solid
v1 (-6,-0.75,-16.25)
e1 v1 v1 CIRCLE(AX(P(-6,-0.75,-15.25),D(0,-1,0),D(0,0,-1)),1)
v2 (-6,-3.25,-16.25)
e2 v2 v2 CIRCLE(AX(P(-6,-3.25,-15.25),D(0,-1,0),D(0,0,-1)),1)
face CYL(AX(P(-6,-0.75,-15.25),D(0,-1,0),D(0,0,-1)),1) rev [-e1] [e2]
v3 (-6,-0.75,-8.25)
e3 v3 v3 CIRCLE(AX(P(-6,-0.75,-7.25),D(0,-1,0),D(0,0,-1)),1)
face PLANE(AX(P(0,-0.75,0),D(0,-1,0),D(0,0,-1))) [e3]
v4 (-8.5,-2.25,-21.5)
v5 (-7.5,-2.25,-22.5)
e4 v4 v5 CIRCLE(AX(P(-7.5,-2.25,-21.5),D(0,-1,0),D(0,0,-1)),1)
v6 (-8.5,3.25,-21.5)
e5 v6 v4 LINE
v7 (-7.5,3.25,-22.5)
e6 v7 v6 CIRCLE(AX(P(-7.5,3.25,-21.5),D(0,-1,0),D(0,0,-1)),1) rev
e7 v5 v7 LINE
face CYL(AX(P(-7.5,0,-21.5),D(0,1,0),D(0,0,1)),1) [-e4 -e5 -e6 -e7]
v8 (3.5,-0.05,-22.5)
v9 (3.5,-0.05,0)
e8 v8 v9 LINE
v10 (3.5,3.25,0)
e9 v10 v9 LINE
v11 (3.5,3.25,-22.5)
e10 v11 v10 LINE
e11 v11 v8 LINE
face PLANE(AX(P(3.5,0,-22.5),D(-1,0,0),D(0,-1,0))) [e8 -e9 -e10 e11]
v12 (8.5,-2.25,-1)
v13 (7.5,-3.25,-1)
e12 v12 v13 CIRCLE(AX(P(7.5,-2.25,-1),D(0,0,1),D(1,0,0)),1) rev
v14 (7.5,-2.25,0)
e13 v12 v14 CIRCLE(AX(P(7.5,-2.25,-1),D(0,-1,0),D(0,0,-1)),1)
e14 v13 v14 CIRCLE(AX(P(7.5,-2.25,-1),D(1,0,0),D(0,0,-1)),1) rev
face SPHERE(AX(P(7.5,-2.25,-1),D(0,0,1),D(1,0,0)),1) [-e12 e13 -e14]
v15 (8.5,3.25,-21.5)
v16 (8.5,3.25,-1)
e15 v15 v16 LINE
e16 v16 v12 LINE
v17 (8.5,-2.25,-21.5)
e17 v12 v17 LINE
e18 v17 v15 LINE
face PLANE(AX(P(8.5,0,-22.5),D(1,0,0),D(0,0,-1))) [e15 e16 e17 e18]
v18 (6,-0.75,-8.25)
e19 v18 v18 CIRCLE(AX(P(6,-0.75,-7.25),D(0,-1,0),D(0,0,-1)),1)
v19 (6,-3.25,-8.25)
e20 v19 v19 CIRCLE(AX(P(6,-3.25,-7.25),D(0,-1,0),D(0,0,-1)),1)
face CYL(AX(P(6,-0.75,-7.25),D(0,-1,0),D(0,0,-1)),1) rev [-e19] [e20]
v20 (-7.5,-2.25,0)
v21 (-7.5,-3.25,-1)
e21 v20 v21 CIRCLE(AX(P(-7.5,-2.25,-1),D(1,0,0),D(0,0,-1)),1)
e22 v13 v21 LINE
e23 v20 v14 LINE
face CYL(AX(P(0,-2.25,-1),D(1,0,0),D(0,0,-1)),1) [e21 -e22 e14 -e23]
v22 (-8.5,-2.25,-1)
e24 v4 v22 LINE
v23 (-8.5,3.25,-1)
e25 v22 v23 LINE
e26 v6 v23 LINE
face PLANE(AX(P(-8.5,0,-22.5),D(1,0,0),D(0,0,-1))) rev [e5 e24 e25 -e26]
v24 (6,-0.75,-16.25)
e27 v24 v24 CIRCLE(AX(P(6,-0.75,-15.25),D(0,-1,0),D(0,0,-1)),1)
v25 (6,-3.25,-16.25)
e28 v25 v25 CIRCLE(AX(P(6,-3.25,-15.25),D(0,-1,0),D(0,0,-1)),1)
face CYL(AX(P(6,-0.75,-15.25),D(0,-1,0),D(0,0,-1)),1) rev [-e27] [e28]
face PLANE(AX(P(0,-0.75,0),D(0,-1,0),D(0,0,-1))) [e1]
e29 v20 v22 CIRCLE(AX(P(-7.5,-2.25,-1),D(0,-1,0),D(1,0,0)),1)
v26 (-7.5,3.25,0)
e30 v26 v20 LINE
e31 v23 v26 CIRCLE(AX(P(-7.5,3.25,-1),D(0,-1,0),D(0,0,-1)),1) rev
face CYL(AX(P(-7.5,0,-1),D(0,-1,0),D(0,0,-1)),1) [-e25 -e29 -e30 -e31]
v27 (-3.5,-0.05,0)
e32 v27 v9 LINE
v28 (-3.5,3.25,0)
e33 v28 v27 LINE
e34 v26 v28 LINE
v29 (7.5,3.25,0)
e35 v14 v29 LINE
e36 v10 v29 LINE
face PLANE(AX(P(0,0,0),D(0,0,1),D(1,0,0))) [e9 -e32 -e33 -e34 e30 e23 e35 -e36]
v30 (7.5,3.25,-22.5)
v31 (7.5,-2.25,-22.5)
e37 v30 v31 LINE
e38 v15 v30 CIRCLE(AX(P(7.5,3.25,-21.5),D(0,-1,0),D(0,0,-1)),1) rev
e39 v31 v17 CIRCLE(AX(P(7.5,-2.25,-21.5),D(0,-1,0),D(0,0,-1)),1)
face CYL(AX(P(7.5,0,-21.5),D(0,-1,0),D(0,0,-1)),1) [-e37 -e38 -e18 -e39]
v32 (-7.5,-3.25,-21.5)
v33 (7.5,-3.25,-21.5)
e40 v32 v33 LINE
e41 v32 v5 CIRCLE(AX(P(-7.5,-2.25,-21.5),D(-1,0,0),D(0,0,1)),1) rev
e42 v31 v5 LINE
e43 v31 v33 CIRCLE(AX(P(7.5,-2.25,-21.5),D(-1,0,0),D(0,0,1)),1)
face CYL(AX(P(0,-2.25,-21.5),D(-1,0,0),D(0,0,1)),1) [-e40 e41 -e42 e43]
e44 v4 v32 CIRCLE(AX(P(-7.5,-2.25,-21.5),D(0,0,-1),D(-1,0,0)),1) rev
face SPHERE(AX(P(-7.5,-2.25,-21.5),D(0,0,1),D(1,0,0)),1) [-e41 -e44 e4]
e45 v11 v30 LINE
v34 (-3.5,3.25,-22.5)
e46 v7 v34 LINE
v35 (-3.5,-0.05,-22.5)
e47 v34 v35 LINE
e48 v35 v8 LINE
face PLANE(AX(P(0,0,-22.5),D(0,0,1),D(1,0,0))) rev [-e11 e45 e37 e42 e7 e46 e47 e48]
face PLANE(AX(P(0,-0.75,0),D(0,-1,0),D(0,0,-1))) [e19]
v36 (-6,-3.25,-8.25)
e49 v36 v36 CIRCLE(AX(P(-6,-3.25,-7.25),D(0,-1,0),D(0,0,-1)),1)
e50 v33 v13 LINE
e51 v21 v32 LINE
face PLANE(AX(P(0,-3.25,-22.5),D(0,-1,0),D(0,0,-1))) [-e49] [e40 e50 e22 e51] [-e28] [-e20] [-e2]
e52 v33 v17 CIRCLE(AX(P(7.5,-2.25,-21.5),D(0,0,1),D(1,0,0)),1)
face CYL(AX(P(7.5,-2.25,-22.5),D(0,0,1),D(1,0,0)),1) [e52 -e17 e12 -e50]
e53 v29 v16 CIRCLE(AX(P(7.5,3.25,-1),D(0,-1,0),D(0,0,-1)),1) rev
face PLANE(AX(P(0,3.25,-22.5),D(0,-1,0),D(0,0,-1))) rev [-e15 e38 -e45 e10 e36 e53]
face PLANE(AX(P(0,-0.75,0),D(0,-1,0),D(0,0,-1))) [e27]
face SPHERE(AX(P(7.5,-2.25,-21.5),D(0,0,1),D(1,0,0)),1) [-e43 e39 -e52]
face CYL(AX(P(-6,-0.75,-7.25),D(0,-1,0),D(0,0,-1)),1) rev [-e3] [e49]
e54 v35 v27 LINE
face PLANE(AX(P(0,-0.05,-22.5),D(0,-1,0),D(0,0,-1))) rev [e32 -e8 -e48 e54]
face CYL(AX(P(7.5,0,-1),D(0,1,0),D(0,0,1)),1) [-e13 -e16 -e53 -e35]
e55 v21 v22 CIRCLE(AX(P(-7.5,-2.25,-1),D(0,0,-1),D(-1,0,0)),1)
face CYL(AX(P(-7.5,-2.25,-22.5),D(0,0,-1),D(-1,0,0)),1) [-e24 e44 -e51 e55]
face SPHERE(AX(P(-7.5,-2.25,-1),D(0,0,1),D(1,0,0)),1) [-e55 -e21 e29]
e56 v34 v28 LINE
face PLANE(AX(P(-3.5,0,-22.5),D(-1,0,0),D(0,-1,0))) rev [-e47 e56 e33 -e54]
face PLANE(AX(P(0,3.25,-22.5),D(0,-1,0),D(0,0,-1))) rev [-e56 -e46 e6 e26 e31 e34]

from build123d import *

# Parameters (mm, degrees)
EXTRUDE_1_DEPTH     = 22.5
CUT_EXTRUDE_1_DEPTH = 2.5
FILLET_1_R          = 1
FILLET_2_R          = 1


with BuildPart() as part:
    # 草图1 → 凸台-拉伸1 (new body)
    with BuildSketch(Plane.XY):
        Polygon((-8.5, 3.25), (-8.5, -3.25), (8.5, -3.25), (8.5, 3.25), (3.5, 3.25), (3.5, -0.05), (-3.5, -0.05), (-3.5, 3.25), align=None)
    extrude(amount=-EXTRUDE_1_DEPTH)

    # 草图2 → 切除-拉伸1 (cut)
    with BuildSketch(Plane.XZ.offset(3.25)):
        with BuildLine():
            Line((-6, -8.25), (-6, -7.25))
            Line((-6, -7.25), (-5, -7.25))
            ThreePointArc((-5, -7.25), (-6.707106781, -6.542893219), (-6, -8.25))
        make_face()
        with BuildLine():
            Line((-5, -7.25), (-6, -7.25))
            Line((-6, -7.25), (-6, -8.25))
            ThreePointArc((-6, -8.25), (-5.292893219, -7.957106781), (-5, -7.25))
        make_face()
        with BuildLine():
            ThreePointArc((7, -7.25), (6, -6.25), (5, -7.25))
            Line((5, -7.25), (6, -7.25))
            Line((6, -7.25), (6, -8.25))
            ThreePointArc((6, -8.25), (6.707106781, -7.957106781), (7, -7.25))
        make_face()
        with BuildLine():
            Line((6, -7.25), (5, -7.25))
            ThreePointArc((5, -7.25), (5.292893219, -7.957106781), (6, -8.25))
            Line((6, -8.25), (6, -7.25))
        make_face()
        with BuildLine():
            ThreePointArc((7, -15.25), (6.707106781, -14.542893219), (6, -14.25))
            Line((6, -14.25), (6, -15.25))
            Line((6, -15.25), (5, -15.25))
            ThreePointArc((5, -15.25), (6, -16.25), (7, -15.25))
        make_face()
        with BuildLine():
            Line((6, -15.25), (6, -14.25))
            ThreePointArc((6, -14.25), (5.292893219, -14.542893219), (5, -15.25))
            Line((5, -15.25), (6, -15.25))
        make_face()
        with BuildLine():
            ThreePointArc((-5, -15.25), (-5.292893219, -14.542893219), (-6, -14.25))
            Line((-6, -14.25), (-6, -15.25))
            Line((-6, -15.25), (-5, -15.25))
        make_face()
        with BuildLine():
            Line((-6, -15.25), (-6, -14.25))
            ThreePointArc((-6, -14.25), (-6.707106781, -15.957106781), (-5, -15.25))
            Line((-5, -15.25), (-6, -15.25))
        make_face()
    extrude(amount=-CUT_EXTRUDE_1_DEPTH, mode=Mode.SUBTRACT)

    # 圆角1
    fillet_1_edges = [part.edges().sort_by_distance(p)[0] for p in [
        (0, -3.25, 0),
        (8.5, -3.25, -11.25),
        (-8.5, -3.25, -11.25),
        (0, -3.25, -22.5),
    ]]
    fillet(fillet_1_edges, radius=FILLET_1_R)

    # 圆角2
    # the kernel refuses this fillet: 1 mm, written as the material it takes off along each edge
    with BuildSketch(Plane(origin=(-7.5, -2.25, -1), x_dir=(0, 0, 1), z_dir=(-1, 0, 0))) as fillet_2_piece_1_section:
        Polygon((0, 0), (FILLET_2_R, 0), (FILLET_2_R, -FILLET_2_R), (0, -FILLET_2_R), align=None)
    fillet_2_piece_1 = extrude(amount=FILLET_2_R, mode=Mode.PRIVATE)
    fillet_2_piece_1 = fillet_2_piece_1 - Plane(origin=(-7.5, -2.25, -1), x_dir=(0, 0.7071067811865475, -0.7071067811865475), z_dir=(-1, 0, 0)) * Sphere(FILLET_2_R, mode=Mode.PRIVATE)
    add(fillet_2_piece_1, mode=Mode.SUBTRACT)
    with BuildSketch(Plane(origin=(7.5, -2.25, -1), x_dir=(1, 0, 0), z_dir=(0, 0, 1))) as fillet_2_piece_2_section:
        Polygon((0, 0), (FILLET_2_R, 0), (FILLET_2_R, -FILLET_2_R), (0, -FILLET_2_R), align=None)
    fillet_2_piece_2 = extrude(amount=FILLET_2_R, mode=Mode.PRIVATE)
    fillet_2_piece_2 = fillet_2_piece_2 - Plane(origin=(7.5, -2.25, -1), x_dir=(-0.7071067811865475, 0.7071067811865475, 0), z_dir=(0, 0, 1)) * Sphere(FILLET_2_R, mode=Mode.PRIVATE)
    add(fillet_2_piece_2, mode=Mode.SUBTRACT)
    with BuildSketch(Plane(origin=(-7.5, -2.25, -21.5), x_dir=(0, 0, -1), z_dir=(-1, 0, 0))) as fillet_2_piece_3_section:
        Polygon((0, 0), (FILLET_2_R, 0), (FILLET_2_R, FILLET_2_R), (0, FILLET_2_R), align=None)
    fillet_2_piece_3 = extrude(amount=FILLET_2_R, mode=Mode.PRIVATE)
    fillet_2_piece_3 = fillet_2_piece_3 - Plane(origin=(-7.5, -2.25, -21.5), x_dir=(0, 0.7071067811865475, 0.7071067811865475), z_dir=(-1, 0, 0)) * Sphere(FILLET_2_R, mode=Mode.PRIVATE)
    add(fillet_2_piece_3, mode=Mode.SUBTRACT)
    with BuildSketch(Plane(origin=(7.5, -2.25, -21.5), x_dir=(1, 0, 0), z_dir=(0, 0, -1))) as fillet_2_piece_4_section:
        Polygon((0, 0), (FILLET_2_R, 0), (FILLET_2_R, FILLET_2_R), (0, FILLET_2_R), align=None)
    fillet_2_piece_4 = extrude(amount=FILLET_2_R, mode=Mode.PRIVATE)
    fillet_2_piece_4 = fillet_2_piece_4 - Plane(origin=(7.5, -2.25, -21.5), x_dir=(-0.7071067811865475, 0.7071067811865475, 0), z_dir=(0, 0, -1)) * Sphere(FILLET_2_R, mode=Mode.PRIVATE)
    add(fillet_2_piece_4, mode=Mode.SUBTRACT)
    with BuildSketch(Plane(origin=(8.5, -2.25, -22.5), x_dir=(-1, 0, 0), z_dir=(0, 1, 0)), Plane(origin=(-8.5, 5.75, 0), x_dir=(0, 0, -1), z_dir=(0, -1, 0))) as fillet_2_piece_5:
        with BuildLine():
            CenterArc((FILLET_2_R, FILLET_2_R), FILLET_2_R, 180, 90)
            Line((0, FILLET_2_R), (0, 0))
            Line((0, 0), (FILLET_2_R, 0))
        make_face()
    extrude(amount=8, mode=Mode.SUBTRACT)
    with BuildSketch(Plane(origin=(-8.5, 5.75, -22.5), x_dir=(0, 0, 1), z_dir=(0, -1, 0)), Plane(origin=(8.5, -2.25, 0), x_dir=(-1, 0, 0), z_dir=(0, 1, 0))) as fillet_2_piece_6:
        with BuildLine():
            CenterArc((FILLET_2_R, -FILLET_2_R), FILLET_2_R, 90, 90)
            Line((0, -FILLET_2_R), (0, 0))
            Line((0, 0), (FILLET_2_R, 0))
        make_face()
    extrude(amount=8, mode=Mode.SUBTRACT)


solid = part.part
